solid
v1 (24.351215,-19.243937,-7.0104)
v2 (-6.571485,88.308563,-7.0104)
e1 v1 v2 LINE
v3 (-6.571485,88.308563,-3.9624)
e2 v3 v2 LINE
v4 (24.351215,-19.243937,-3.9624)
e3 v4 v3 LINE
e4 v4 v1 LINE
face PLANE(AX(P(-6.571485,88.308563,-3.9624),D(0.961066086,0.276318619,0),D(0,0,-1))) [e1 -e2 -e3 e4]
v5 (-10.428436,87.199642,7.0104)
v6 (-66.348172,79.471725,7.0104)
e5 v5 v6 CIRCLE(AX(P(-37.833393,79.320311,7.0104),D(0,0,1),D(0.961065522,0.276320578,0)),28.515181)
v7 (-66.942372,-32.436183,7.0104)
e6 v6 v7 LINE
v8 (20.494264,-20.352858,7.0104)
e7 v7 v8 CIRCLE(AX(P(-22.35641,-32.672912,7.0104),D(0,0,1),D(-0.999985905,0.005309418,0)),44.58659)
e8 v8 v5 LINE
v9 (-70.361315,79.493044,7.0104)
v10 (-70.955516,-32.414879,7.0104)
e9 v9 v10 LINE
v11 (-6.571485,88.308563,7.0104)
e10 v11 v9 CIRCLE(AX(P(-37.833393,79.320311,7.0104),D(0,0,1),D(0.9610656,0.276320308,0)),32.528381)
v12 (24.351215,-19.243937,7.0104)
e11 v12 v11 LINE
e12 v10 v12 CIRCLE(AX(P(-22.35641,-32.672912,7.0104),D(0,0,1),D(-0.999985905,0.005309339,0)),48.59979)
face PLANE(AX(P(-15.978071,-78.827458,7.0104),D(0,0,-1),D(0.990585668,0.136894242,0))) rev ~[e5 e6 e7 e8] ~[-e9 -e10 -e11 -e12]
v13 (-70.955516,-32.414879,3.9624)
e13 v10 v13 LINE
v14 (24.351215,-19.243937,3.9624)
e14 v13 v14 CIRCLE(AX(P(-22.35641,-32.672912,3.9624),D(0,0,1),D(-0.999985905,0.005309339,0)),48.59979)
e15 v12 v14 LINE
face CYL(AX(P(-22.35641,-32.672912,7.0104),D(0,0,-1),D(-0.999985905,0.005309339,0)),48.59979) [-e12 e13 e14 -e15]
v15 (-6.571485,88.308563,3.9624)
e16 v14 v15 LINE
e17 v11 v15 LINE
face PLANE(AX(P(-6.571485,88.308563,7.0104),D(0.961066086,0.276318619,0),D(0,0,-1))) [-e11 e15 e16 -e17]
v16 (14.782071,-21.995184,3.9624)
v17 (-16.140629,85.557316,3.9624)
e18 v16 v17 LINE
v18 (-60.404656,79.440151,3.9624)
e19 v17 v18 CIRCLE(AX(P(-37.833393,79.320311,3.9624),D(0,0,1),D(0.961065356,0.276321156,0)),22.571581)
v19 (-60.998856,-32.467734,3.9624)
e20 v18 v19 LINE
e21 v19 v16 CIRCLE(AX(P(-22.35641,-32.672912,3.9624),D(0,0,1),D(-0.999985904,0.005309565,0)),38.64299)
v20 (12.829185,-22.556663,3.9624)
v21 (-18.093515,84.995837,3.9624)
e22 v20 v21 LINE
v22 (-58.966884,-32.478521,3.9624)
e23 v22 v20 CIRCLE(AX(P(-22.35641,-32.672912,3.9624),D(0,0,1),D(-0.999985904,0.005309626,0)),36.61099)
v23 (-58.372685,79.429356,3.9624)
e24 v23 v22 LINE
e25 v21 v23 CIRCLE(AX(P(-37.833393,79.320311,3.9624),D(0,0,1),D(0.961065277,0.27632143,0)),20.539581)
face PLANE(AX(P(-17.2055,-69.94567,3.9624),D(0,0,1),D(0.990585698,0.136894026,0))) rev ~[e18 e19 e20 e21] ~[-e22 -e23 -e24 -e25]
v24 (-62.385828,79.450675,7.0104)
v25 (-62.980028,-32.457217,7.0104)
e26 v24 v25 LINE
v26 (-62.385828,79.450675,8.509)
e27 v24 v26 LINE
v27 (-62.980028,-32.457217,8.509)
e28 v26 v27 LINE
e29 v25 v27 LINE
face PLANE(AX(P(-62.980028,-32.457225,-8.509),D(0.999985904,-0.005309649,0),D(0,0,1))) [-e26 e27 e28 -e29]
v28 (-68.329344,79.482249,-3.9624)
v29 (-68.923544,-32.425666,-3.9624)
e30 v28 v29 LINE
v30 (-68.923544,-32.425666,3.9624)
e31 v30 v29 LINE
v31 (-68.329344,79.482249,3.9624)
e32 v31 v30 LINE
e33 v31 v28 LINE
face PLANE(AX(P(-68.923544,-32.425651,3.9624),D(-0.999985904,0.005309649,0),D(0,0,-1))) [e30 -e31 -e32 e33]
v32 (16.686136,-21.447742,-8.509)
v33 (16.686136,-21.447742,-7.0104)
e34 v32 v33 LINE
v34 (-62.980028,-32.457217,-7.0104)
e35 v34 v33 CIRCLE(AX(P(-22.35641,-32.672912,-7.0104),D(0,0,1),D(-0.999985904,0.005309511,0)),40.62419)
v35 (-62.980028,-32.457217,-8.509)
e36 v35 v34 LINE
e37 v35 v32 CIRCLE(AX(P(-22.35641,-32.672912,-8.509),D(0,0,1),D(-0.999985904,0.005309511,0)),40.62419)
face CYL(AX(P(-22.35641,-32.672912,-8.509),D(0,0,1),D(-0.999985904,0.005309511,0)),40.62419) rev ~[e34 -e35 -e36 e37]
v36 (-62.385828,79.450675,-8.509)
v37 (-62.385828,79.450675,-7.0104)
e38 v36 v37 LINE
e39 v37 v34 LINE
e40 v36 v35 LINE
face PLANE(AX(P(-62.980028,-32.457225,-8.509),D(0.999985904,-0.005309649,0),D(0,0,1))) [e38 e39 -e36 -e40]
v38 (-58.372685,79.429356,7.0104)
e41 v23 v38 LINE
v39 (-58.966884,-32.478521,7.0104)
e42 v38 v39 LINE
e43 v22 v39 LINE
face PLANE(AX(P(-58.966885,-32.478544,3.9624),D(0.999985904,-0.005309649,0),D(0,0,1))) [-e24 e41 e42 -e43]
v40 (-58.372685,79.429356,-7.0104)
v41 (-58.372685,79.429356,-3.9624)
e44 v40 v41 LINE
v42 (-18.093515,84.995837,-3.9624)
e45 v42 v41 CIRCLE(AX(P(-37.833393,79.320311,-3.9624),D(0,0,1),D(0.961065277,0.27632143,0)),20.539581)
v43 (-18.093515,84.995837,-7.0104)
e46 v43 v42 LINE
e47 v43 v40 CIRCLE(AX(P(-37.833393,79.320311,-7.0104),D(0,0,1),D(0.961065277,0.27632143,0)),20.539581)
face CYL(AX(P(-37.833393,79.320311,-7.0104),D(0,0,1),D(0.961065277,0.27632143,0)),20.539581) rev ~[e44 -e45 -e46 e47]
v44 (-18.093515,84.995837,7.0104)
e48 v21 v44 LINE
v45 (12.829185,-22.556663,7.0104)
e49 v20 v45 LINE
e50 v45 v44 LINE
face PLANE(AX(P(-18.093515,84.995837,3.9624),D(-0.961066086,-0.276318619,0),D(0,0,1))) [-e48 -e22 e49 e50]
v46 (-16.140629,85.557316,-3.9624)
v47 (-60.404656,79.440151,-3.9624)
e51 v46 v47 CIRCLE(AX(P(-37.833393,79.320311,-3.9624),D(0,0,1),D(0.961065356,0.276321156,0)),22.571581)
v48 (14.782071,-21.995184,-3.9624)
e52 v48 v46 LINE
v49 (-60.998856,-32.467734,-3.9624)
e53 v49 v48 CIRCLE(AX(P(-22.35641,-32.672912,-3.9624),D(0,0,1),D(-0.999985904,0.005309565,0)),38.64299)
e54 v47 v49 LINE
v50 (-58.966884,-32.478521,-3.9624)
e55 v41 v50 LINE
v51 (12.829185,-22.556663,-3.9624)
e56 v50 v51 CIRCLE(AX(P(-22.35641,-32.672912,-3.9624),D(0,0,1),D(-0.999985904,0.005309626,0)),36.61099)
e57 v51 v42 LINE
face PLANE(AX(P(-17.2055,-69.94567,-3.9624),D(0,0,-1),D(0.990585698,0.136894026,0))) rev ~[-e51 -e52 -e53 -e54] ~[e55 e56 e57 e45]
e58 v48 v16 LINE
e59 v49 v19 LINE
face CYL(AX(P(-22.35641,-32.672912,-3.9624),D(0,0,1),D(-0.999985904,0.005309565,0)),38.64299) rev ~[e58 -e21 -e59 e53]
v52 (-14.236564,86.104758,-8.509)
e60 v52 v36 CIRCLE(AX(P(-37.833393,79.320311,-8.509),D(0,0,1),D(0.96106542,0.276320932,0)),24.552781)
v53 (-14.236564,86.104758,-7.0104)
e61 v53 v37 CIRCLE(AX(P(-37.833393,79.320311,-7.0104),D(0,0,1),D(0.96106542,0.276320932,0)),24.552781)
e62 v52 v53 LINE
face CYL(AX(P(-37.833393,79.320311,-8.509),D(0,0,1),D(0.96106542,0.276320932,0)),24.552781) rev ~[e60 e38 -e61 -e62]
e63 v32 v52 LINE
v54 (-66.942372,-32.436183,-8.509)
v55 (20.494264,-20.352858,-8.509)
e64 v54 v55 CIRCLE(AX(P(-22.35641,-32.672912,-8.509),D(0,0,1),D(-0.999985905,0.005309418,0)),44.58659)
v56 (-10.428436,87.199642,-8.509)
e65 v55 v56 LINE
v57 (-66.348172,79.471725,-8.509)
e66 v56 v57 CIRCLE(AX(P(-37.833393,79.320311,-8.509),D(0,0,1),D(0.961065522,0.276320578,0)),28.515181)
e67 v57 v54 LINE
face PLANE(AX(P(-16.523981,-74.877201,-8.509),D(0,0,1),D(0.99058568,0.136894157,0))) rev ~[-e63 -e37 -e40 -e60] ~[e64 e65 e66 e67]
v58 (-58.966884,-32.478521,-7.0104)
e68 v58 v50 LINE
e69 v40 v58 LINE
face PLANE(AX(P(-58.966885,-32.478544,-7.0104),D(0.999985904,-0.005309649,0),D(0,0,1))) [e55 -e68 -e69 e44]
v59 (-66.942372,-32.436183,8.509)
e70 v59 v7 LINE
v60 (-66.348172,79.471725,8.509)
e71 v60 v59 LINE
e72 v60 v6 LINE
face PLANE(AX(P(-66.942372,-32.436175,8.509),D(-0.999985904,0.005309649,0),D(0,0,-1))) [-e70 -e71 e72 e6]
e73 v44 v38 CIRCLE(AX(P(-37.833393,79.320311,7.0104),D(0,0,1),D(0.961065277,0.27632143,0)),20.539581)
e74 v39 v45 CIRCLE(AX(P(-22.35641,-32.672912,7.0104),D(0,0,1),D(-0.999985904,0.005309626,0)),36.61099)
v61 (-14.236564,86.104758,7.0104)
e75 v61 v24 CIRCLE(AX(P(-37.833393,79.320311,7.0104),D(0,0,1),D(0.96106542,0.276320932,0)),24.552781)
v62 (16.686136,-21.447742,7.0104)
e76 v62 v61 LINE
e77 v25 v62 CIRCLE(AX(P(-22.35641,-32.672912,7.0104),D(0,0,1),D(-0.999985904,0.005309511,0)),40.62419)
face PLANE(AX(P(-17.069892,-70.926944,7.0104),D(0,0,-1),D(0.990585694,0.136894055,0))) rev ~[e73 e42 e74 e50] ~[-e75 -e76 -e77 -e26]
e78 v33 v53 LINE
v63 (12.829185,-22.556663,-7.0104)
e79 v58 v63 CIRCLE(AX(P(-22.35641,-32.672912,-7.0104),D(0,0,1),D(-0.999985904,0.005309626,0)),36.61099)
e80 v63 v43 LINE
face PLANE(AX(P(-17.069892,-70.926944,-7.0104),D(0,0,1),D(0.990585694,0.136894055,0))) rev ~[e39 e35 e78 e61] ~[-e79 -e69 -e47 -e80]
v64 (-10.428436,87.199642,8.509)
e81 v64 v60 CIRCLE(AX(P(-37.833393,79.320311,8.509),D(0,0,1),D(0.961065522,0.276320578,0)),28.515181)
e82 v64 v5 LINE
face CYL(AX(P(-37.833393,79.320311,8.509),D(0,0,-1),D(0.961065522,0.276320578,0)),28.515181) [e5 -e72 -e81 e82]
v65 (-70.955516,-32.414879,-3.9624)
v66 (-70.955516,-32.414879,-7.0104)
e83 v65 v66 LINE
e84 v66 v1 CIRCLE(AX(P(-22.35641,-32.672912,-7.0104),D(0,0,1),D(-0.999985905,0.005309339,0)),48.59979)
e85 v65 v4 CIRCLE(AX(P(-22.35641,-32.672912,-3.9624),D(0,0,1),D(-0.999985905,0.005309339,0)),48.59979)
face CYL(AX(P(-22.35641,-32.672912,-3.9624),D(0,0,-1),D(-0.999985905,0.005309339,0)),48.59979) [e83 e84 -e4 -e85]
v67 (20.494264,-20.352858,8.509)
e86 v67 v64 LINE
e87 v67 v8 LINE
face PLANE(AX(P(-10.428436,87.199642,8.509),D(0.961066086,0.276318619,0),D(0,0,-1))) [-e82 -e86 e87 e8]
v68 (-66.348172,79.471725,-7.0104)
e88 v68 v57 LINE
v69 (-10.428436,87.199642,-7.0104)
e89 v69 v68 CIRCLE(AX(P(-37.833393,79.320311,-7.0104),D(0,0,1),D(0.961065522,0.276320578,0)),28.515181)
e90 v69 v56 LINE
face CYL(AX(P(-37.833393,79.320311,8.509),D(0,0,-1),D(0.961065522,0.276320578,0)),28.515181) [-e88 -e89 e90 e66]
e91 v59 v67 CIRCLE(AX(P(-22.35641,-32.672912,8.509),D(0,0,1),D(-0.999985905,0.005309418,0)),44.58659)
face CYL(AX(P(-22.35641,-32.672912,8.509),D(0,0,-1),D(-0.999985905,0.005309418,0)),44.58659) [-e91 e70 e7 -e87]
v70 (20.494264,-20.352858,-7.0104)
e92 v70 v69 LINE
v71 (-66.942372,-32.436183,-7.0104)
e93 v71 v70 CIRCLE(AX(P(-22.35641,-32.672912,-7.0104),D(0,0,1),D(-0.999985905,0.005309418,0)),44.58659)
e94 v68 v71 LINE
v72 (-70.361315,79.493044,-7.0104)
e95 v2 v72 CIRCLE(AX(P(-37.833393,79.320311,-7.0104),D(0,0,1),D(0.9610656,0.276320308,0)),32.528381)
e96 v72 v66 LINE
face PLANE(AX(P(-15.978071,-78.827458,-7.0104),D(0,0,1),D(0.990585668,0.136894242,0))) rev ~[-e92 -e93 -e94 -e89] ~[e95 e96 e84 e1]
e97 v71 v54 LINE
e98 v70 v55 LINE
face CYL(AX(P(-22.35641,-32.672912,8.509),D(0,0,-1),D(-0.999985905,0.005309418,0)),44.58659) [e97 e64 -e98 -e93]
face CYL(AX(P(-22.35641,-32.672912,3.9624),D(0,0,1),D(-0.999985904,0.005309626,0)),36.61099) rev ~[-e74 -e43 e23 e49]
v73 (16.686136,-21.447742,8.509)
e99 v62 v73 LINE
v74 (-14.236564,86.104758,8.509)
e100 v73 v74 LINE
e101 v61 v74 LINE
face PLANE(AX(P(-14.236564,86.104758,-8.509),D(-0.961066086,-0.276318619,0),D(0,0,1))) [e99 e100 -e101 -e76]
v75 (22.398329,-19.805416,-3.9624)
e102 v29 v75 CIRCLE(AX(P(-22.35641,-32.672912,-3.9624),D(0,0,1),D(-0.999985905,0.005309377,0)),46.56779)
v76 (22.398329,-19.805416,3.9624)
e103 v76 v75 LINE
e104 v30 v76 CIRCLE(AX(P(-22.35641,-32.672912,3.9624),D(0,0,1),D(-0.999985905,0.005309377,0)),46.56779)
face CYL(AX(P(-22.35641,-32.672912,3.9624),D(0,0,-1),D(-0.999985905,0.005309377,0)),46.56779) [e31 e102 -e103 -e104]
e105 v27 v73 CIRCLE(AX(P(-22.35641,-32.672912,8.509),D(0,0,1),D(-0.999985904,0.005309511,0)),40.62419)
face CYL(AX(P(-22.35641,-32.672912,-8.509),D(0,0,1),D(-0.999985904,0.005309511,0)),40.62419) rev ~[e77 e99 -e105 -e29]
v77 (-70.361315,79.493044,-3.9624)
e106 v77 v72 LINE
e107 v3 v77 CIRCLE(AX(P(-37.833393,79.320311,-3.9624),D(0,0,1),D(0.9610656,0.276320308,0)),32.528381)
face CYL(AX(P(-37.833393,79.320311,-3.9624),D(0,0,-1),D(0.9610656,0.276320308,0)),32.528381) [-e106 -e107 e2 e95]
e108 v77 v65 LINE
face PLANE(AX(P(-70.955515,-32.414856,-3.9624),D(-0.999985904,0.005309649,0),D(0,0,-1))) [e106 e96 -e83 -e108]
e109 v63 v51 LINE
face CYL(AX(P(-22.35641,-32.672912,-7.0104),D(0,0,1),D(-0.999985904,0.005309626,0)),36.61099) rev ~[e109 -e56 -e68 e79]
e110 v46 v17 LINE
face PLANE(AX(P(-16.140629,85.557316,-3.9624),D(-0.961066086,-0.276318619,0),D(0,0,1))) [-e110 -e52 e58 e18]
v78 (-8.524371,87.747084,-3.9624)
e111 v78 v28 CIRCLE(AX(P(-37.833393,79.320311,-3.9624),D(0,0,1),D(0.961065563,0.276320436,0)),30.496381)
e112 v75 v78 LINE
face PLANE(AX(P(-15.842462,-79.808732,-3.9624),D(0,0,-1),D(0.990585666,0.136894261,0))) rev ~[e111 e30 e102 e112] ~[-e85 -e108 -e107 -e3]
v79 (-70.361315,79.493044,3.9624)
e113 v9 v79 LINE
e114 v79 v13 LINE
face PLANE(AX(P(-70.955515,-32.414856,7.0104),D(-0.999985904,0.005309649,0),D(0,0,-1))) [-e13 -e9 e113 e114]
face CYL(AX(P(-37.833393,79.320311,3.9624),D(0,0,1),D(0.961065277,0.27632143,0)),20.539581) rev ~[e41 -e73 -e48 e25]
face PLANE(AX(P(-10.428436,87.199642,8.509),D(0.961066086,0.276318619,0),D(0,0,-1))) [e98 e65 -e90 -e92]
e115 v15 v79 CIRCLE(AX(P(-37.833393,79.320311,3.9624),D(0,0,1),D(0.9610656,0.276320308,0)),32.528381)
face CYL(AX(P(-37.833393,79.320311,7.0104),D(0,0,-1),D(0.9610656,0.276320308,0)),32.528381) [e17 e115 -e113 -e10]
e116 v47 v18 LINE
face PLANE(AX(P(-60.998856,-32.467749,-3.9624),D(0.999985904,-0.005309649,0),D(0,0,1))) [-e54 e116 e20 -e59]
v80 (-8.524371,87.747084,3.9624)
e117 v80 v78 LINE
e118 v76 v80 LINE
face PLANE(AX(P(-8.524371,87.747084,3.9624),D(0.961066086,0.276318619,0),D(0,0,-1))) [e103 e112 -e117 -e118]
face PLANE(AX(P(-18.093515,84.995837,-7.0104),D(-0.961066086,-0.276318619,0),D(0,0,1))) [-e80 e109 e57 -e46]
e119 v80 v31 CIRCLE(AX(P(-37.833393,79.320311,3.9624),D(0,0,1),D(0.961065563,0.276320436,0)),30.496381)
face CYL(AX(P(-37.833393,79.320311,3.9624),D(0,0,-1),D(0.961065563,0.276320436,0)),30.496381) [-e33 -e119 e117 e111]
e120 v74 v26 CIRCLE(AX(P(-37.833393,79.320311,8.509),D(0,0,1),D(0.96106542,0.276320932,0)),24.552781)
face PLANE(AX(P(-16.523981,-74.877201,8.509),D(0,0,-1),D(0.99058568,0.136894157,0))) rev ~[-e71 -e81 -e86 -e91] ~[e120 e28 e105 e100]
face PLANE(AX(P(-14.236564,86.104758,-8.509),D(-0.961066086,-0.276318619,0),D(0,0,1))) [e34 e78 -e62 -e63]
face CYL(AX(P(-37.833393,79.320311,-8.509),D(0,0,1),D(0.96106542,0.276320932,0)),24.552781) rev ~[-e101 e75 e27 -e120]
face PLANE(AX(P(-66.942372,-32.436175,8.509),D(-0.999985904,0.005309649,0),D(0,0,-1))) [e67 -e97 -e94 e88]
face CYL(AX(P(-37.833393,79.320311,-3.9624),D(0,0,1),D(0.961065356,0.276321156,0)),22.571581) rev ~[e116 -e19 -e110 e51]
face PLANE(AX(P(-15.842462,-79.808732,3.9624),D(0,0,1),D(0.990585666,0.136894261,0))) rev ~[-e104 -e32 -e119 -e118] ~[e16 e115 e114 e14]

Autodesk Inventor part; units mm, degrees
ref_plane "Work Plane2" through (-22.3564, -32.6729, 0) normal (-1, 0, 0) x (0, 0, 1)
ref_plane "Work Plane3" through (-37.8334, 79.3203, 0) normal (-0.2060201, -0.9785478, 0) x (0, 0, 1)
sketch "Path" plane through (0, 0, 0) normal (0, 0, 1) x (1, 0, 0)
  arc A0 (-64.9612, -32.4467) -> (18.5902, -20.9003) centre (-22.3564, -32.6729) ccw
  arc A1 (-12.3325, 86.6522) -> (-64.367, 79.4612) centre (-37.8334, 79.3203) ccw
  line L0 (-12.3325, 86.6522) -> (18.5902, -20.9003)
  line L1 (-64.9612, -32.4467) -> (-64.367, 79.4612)
  dimension "d31" = 11.9888
ref_plane "Section Plane" through (18.5902, -20.9003, 0) normal (-0.2763184, 0.9610662, 0) x (0, 0, 1)
sketch "Section Sketch" plane through (18.5902, -20.9003, 0) normal (-0.2763184, 0.9610662, 0) x (0, 0, 1)
  line L0 (-8.509, -1.9812) -> (8.509, -1.9812)
  line L1 (8.509, -1.9812) -> (8.509, 1.9812)
  line L2 (8.509, 1.9812) -> (-8.509, 1.9812)
  line L3 (-8.509, 1.9812) -> (-8.509, -1.9812)
  line L4 (-3.9624, -3.9624) -> (3.9624, -3.9624)
  line L5 (3.9624, -3.9624) -> (3.9624, 3.9624)
  line L6 (3.9624, 3.9624) -> (-3.9624, 3.9624)
  line L7 (-3.9624, 3.9624) -> (-3.9624, -3.9624)
  line L8 (-3.9624, 0) -> (3.9624, 0) construction
  line L9 (-7.0104, -5.9944) -> (-3.9624, -5.9944)
  line L10 (-3.9624, -5.9944) -> (-3.9624, 5.9944)
  line L11 (-3.9624, 5.9944) -> (-7.0104, 5.9944)
  line L12 (-7.0104, 5.9944) -> (-7.0104, -5.9944)
  line L13 (3.9624, -5.9944) -> (7.0104, -5.9944)
  line L14 (7.0104, -5.9944) -> (7.0104, 5.9944)
  line L15 (7.0104, 5.9944) -> (3.9624, 5.9944)
  line L16 (3.9624, 5.9944) -> (3.9624, -5.9944)
  line L17 (-8.509, 0) -> (8.509, 0) construction
  point P0 (0, 0)
  point P1 (0, 0)
  dimension "d21" = 3.9624
  dimension "d22" = 7.9248
  dimension "d23" = 7.9248
  dimension "d24" = 3.048
  dimension "d31" = 11.9888
  dimension "d32" = 17.018
sweep "Solid" add profiles "Section Sketch" path "Path"
pattern_of_one "Strand Pattern"
equation "\"d21\" = da_d2"
equation "\"d22\" = da_d1"
equation "\"d23\" = da_b1"
equation "\"d24\" = da_t1 + da_t2"
equation "\"d30\" = da_pt"
equation "\"da_p\" = 12.7"
equation "\"da_b1\" = 7.9248"
equation "\"da_h2\" = 11.9888"
equation "\"da_h3\" = 10.3886"
equation "\"da_d1\" = 7.9248"
equation "\"da_d2\" = 3.9624"
equation "\"da_pt\" = 14.3764"
equation "\"da_b\" = 17.018"
equation "\"da_t1\" = 1.524"
equation "\"da_t2\" = 1.524"
properties part number "Roller Chain"
